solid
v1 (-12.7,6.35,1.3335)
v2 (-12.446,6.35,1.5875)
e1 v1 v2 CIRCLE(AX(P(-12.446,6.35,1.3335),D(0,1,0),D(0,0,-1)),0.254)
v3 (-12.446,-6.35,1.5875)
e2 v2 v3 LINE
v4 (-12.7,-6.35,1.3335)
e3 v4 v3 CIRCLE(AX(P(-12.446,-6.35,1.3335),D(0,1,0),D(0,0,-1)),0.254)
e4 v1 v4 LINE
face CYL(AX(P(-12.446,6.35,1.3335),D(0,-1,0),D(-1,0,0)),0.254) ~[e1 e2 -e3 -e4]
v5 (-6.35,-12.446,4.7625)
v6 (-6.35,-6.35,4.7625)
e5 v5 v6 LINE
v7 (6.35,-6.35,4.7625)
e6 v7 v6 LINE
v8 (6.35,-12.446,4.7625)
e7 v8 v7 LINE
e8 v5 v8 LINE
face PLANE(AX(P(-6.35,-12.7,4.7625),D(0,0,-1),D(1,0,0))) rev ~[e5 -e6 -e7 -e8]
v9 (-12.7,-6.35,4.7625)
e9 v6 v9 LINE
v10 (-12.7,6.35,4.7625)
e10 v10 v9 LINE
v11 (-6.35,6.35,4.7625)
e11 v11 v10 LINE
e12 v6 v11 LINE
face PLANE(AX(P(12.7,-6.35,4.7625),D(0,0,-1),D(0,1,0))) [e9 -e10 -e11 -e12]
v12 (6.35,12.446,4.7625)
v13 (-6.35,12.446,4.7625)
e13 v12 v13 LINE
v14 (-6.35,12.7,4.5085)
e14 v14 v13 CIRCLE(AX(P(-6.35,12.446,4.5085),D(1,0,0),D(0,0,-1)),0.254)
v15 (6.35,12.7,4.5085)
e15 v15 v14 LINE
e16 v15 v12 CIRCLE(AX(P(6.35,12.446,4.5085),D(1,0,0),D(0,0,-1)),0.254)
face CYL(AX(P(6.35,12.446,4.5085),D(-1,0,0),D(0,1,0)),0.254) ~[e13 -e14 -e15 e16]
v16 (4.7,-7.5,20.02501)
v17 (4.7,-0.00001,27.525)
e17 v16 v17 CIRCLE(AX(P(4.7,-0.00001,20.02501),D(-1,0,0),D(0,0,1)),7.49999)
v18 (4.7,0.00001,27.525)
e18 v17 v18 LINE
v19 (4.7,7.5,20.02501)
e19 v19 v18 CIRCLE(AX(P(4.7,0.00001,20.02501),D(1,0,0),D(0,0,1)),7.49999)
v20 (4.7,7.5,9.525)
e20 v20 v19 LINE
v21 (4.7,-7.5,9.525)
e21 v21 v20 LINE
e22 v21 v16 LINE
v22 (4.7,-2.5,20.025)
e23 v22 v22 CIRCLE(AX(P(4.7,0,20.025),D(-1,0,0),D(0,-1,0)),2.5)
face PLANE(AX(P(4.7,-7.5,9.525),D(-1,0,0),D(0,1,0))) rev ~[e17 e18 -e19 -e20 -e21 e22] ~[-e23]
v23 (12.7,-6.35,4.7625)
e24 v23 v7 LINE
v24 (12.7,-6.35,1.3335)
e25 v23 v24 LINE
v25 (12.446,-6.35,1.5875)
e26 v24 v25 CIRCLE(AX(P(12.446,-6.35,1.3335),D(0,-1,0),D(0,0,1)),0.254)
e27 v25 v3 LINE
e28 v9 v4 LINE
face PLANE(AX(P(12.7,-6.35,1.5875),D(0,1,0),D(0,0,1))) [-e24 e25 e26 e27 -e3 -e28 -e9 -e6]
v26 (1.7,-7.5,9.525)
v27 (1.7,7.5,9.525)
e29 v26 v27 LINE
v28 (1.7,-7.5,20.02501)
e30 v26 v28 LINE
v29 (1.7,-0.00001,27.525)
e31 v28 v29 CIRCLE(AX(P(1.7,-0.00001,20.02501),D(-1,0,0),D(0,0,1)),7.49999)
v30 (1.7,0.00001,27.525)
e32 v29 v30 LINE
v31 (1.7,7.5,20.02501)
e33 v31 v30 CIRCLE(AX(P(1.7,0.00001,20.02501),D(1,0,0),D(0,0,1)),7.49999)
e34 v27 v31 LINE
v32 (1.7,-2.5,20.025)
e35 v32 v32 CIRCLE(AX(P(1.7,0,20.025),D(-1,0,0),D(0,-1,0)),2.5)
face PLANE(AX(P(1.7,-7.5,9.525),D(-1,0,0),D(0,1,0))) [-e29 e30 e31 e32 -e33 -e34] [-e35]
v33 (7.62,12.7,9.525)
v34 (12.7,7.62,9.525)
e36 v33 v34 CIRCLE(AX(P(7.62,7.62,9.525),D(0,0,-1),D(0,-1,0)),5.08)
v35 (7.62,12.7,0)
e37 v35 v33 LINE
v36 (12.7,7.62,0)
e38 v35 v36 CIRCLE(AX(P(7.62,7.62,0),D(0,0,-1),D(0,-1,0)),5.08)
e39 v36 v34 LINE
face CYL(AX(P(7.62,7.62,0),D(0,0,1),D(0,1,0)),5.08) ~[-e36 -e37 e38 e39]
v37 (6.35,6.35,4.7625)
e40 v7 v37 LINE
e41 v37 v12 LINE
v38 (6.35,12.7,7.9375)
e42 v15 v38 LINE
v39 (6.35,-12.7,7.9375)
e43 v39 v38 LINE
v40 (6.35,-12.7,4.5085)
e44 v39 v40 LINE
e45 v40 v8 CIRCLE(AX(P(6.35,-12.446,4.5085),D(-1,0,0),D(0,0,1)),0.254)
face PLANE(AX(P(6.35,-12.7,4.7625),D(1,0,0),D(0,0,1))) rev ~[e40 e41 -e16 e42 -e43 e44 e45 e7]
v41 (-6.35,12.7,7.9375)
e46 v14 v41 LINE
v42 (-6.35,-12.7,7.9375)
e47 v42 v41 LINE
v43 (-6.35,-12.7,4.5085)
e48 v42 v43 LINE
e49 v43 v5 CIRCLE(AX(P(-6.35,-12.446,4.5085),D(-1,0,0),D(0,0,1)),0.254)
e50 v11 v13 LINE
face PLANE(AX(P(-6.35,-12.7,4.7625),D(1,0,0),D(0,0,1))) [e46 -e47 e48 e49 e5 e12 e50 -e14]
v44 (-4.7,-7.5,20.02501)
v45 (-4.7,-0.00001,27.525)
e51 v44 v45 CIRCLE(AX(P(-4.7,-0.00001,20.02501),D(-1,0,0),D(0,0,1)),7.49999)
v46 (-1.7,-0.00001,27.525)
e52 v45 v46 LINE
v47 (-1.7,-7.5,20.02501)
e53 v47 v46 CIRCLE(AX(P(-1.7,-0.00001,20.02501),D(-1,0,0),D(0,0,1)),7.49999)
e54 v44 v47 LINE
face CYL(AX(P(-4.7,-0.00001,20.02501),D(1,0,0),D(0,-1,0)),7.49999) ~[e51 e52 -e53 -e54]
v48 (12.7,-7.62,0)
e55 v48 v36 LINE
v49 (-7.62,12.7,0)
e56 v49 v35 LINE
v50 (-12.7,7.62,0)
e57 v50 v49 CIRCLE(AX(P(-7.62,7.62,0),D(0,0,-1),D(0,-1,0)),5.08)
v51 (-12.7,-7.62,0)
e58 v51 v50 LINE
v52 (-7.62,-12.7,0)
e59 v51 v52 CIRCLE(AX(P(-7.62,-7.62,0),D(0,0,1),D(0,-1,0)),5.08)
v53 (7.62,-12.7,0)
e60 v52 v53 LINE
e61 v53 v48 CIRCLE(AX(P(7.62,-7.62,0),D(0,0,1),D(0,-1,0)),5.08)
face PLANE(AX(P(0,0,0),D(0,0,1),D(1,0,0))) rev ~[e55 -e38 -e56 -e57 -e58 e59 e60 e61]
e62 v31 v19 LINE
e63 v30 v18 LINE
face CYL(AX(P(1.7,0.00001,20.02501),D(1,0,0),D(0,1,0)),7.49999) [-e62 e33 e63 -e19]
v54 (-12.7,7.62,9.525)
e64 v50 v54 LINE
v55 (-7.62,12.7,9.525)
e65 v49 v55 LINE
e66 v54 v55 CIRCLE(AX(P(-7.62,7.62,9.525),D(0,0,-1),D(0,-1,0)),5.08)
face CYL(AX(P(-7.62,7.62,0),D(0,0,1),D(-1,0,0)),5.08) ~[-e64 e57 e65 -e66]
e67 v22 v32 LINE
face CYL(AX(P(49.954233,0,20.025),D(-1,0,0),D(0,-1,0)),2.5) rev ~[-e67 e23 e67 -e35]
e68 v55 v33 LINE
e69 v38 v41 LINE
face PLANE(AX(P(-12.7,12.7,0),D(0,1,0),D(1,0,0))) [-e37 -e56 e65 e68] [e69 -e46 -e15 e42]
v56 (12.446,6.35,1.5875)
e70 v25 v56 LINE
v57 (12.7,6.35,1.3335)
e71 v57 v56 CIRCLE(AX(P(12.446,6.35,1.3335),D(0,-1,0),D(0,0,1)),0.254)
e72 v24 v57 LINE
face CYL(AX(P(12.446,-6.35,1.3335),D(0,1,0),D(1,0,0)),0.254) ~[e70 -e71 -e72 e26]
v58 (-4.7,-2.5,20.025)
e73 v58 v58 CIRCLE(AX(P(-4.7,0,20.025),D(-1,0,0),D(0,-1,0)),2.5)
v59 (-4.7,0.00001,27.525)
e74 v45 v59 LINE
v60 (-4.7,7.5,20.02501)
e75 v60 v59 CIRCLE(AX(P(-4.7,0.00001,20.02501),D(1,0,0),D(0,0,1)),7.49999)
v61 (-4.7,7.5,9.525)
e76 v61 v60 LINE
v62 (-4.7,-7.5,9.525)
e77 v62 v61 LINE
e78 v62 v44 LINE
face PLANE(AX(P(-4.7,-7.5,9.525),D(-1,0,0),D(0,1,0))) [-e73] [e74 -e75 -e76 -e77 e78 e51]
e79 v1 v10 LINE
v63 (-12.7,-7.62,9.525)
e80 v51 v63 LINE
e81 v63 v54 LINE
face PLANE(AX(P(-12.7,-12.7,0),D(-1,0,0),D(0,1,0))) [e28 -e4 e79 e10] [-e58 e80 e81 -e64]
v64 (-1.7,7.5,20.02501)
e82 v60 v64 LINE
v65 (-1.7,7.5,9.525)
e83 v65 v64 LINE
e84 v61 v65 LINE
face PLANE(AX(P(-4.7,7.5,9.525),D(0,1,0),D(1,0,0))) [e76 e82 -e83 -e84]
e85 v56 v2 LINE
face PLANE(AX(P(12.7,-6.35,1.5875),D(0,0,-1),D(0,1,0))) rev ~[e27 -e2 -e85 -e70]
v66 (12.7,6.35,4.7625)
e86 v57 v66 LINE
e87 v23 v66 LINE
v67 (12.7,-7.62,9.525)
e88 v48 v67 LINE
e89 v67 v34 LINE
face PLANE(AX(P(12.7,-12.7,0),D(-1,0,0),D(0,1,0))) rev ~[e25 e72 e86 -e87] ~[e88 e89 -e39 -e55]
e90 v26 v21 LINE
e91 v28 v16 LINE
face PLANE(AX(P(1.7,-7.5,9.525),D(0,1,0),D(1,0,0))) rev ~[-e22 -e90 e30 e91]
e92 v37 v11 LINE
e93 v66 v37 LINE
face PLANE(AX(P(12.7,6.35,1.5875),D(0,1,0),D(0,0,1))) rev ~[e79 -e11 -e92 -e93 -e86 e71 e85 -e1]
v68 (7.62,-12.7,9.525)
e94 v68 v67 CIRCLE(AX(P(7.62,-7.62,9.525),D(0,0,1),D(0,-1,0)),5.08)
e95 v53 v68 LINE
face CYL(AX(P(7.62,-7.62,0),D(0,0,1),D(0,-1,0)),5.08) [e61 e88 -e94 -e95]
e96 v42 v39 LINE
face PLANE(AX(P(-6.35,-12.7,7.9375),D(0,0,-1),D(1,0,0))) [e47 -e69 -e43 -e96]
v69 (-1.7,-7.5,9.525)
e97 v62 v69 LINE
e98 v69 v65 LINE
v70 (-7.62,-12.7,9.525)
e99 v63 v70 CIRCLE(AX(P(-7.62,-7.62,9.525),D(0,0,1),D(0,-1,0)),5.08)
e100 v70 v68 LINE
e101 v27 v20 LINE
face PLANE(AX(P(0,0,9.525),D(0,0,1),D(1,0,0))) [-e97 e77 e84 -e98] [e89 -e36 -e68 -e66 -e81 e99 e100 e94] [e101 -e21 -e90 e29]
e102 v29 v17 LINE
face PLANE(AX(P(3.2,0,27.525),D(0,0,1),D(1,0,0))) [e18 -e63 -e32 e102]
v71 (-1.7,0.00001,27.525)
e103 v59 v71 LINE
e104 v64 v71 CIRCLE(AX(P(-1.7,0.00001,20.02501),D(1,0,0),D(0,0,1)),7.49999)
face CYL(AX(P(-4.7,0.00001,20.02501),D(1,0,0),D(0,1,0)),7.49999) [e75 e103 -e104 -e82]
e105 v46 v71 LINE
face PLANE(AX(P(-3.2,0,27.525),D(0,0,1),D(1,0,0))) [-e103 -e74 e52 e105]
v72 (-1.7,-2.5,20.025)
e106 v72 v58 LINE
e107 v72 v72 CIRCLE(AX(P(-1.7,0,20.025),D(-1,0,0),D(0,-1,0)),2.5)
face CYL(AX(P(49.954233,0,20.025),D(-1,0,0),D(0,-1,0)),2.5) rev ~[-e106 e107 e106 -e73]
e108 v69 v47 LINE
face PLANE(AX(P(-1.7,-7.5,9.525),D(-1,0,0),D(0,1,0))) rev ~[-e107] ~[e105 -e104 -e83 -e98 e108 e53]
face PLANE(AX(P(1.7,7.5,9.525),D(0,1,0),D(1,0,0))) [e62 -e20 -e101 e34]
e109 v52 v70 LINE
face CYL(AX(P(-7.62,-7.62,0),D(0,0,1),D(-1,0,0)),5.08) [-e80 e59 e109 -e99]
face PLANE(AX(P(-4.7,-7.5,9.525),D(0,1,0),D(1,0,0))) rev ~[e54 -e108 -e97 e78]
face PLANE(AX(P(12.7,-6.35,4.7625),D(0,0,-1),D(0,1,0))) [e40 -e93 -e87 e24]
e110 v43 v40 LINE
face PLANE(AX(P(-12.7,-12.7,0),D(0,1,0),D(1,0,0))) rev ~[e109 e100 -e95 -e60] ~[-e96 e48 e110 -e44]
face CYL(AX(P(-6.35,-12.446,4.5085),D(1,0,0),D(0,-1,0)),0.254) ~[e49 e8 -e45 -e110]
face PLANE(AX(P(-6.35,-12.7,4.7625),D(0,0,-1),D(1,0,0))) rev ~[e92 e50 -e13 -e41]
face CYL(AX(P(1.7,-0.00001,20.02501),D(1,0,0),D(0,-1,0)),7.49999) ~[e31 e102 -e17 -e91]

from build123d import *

# Parameters (mm, degrees)
F0_W     = 25.4
F0_H     = 25.4
F1_DEPTH = 9.525
F2_W     = 3
F2_H     = 15
F3_DEPTH = 18
F4_R     = 7.49999
F5_W     = 12.7
F5_H     = 3.175
F6_DEPTH = 25.401
F7_W     = 12.7
F7_H     = 3.175
F8_DEPTH = 25.401
F10_D    = 5
F11_R    = 5.08
F12_R    = 0.254


# Not quite as in the source:
# - a fillet or chamfer is up to 0.001 mm smaller than in the source, because OpenCascade refuses the exact size


with BuildPart() as f1:
    # F0 (on Top) → F1 (new body)
    with BuildSketch(Plane.XY):
        Rectangle(F0_W, F0_H)
    extrude(amount=F1_DEPTH)

    # F2 (on face) → F3 (join)
    with BuildSketch(Plane.XY.offset(9.525)):
        with Locations((-3.2, 0)):
            Rectangle(F2_W, F2_H)
        with Locations((3.2, 0)):
            Rectangle(F2_W, F2_H)
    extrude(amount=F3_DEPTH)

    # F4 (radius 7.5 in the source; OpenCascade refuses exactly that, so slightly less here)
    f4_edges = [f1.edges().sort_by_distance(p)[0] for p in [
        (3.2, 7.5, 27.525),
        (3.2, -7.5, 27.525),
        (-3.2, 7.5, 27.525),
        (-3.2, -7.5, 27.525),
    ]]
    fillet(f4_edges, radius=F4_R)

    # F5 (on face) → F6 (cut, through all)
    with BuildSketch(Plane.YZ.offset(12.7)):
        with Locations((0, 3.175)):
            Rectangle(F5_W, F5_H)
    extrude(amount=-F6_DEPTH, mode=Mode.SUBTRACT)

    # F7 (on face) → F8 (cut, through all)
    with BuildSketch(Plane.XZ.offset(12.7)):
        with Locations((0, 6.35)):
            Rectangle(F7_W, F7_H)
    extrude(amount=-F8_DEPTH, mode=Mode.SUBTRACT)

    # F10 (through all)
    with Locations(Plane.YZ.offset(4.7)):
        with Locations((0, 20.025)):
            Hole(F10_D / 2)

    # F11
    f11_edges = [f1.edges().sort_by_distance(p)[0] for p in [
        (12.7, -12.7, 4.7625),
        (-12.7, -12.7, 4.7625),
        (12.7, 12.7, 4.7625),
        (-12.7, 12.7, 4.7625),
    ]]
    fillet(f11_edges, radius=F11_R)

    # F12
    f12_edges = [f1.edges().sort_by_distance(p)[0] for p in [
        (0, -12.7, 4.7625),
        (12.7, 0, 1.5875),
        (0, 12.7, 4.7625),
        (-12.7, 0, 1.5875),
    ]]
    fillet(f12_edges, radius=F12_R)


solid = f1.part
